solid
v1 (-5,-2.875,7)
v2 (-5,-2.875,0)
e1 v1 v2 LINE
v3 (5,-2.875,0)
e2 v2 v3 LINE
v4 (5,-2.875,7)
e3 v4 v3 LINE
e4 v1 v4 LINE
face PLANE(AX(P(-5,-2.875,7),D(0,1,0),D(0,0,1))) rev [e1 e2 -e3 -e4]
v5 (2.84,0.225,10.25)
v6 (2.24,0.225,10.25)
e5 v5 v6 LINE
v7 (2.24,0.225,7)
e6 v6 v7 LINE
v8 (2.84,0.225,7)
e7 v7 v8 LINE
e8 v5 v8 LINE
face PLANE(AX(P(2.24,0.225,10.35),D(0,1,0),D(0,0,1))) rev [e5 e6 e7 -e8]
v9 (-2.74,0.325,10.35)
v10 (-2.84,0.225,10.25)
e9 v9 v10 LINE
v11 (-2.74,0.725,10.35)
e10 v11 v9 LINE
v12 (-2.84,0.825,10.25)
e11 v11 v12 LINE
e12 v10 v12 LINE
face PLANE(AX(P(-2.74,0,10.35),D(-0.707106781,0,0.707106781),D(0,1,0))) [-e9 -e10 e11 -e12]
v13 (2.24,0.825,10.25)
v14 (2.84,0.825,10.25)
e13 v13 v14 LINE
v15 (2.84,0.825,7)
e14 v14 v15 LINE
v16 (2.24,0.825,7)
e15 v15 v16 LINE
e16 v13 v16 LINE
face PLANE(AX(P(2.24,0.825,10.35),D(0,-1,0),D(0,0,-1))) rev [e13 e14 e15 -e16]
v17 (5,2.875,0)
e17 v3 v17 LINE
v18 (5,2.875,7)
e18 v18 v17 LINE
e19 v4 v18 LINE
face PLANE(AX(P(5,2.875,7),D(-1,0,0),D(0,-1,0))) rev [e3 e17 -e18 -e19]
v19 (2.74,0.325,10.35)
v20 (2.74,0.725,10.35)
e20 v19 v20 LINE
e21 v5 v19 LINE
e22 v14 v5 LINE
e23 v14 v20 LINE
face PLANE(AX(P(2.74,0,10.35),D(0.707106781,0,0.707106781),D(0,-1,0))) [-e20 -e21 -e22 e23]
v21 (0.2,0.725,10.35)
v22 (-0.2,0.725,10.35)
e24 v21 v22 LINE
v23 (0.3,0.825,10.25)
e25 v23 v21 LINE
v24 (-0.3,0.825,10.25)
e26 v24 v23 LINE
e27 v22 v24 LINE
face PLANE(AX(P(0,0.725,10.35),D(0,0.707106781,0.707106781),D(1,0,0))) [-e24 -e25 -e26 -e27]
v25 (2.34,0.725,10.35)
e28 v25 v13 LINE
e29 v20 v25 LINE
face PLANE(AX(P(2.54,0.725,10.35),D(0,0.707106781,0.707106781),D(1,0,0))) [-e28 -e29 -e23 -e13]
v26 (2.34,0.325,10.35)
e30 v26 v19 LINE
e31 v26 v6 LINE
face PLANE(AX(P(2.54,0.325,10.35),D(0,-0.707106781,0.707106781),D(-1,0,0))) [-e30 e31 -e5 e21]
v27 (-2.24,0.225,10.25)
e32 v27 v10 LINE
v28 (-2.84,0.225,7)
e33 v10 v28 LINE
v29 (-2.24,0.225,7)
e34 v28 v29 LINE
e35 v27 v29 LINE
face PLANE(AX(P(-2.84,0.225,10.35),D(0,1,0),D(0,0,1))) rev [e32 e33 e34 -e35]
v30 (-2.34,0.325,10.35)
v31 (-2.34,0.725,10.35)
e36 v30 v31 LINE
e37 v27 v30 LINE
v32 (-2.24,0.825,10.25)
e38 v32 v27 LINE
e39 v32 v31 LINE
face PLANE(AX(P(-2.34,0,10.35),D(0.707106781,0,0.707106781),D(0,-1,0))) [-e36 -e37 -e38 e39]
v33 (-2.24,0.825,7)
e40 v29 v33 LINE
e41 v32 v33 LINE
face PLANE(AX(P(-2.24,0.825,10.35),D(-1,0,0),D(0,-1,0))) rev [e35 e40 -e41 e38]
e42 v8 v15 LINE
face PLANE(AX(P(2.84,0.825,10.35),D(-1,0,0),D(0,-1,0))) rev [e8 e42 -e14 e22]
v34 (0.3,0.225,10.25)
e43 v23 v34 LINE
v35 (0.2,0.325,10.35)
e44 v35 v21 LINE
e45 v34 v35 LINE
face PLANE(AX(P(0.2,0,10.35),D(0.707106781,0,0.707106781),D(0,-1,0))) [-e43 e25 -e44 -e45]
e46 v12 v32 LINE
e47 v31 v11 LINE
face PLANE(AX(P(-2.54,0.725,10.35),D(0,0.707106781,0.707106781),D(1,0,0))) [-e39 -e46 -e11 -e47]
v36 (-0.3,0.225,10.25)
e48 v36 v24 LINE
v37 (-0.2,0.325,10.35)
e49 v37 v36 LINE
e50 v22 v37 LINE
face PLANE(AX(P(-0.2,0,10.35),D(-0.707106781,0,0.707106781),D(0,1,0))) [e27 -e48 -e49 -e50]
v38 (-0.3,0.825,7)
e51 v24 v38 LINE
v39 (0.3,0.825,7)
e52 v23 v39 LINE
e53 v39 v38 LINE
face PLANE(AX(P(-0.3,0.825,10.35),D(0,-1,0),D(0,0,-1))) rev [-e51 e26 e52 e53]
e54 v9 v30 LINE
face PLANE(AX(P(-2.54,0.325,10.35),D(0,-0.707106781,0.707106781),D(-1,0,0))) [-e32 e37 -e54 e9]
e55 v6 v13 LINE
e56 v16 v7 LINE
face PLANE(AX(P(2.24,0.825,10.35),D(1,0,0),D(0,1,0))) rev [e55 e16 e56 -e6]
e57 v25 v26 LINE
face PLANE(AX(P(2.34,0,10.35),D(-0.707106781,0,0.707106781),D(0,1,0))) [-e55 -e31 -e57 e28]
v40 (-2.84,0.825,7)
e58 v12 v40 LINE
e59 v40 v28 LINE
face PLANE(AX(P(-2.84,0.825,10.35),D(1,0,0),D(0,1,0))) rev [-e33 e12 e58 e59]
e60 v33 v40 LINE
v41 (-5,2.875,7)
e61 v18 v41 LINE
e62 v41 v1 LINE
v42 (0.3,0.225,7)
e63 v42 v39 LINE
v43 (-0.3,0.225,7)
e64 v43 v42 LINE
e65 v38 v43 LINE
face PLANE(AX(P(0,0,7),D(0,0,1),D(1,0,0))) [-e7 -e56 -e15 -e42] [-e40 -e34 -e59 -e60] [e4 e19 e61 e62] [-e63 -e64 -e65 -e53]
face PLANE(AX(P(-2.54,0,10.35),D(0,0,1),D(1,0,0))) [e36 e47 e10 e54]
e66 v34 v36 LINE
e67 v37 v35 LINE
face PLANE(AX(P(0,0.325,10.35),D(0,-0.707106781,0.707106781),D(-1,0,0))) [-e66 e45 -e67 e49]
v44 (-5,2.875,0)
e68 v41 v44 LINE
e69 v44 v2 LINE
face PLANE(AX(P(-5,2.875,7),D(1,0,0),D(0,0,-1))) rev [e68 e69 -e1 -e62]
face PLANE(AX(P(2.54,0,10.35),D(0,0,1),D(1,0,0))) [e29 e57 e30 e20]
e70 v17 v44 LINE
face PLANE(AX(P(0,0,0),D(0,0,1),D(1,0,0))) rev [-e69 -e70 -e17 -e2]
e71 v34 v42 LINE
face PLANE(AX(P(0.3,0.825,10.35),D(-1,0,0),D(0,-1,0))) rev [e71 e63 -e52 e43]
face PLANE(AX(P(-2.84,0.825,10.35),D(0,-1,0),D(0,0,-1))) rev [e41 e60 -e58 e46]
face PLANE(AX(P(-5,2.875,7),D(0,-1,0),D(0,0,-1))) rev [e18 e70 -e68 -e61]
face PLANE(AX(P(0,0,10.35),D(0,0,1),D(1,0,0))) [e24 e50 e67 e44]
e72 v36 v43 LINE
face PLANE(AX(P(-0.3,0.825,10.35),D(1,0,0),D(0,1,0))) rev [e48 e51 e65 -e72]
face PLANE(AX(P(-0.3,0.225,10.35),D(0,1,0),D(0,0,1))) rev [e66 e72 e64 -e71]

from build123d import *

# Parameters (mm, degrees)
ESBO_O1_W                       = 10
ESBO_O1_H                       = 5.75
RESSALTO_EXTRUS_O1_DEPTH        = 7
ESBO_O2_W                       = 0.6
ESBO_O2_H                       = 0.6
RESSALTO_EXTRUS_O2_DEPTH        = 3.35
CHANFRO1_SIZE                   = 0.1
PADR_O_LINEAR1_COUNT            = 2
PADR_O_LINEAR1_PITCH            = 2.54
CHANFRO1_OF_PADR_O_LINEAR1_SIZE = 0.1
PADR_O_START                    = 0.325
PADR_O_LINEAR2_DEPTH            = 0.4
PADR_O_START_2                  = -2.84
PADR_O_LINEAR2_2_DEPTH          = 0.6
PADR_O_START_3                  = -9.256027766
PADR_O_LINEAR2_3_OUTLINE_W      = 1.336074683
PADR_O_LINEAR2_3_OUTLINE_H      = 1.275
PADR_O_LINEAR2_3_OUTLINE_H_2    = 1.325
PADR_O_LINEAR2_3_DEPTH          = 1.256027766
PADR_O_START_4                  = -10
PADR_O_LINEAR2_4_OUTLINE_W      = 1.663925317
PADR_O_LINEAR2_4_OUTLINE_H      = 1.275
PADR_O_LINEAR2_4_OUTLINE_H_2    = 1.325
PADR_O_LINEAR2_4_DEPTH          = 0.743972234


with BuildPart() as part:
    # Esboço1 → Ressalto-extrusão1 (new body)
    with BuildSketch(Plane.XY):
        Rectangle(ESBO_O1_W, ESBO_O1_H)
    extrude(amount=RESSALTO_EXTRUS_O1_DEPTH)

    # Esboço2 → Ressalto-extrusão2 (add)
    with BuildSketch(Plane.XY.offset(7)):
        with Locations((0, 0.525)):
            Rectangle(ESBO_O2_W, ESBO_O2_H)
    ressalto_extrus_o2 = extrude(amount=RESSALTO_EXTRUS_O2_DEPTH)

    # Chanfro1
    chanfro1_edges = [part.edges().sort_by_distance(p)[0] for p in [
        (0.3, 0.525, 10.35),
        (0, 0.825, 10.35),
        (-0.3, 0.525, 10.35),
        (0, 0.225, 10.35),
    ]]
    chamfer(chanfro1_edges, length=CHANFRO1_SIZE)

    # Padrão linear1: Ressalto-extrusão2 ×2
    with Locations(*[(i * PADR_O_LINEAR1_PITCH, 0, 0) for i in range(1, PADR_O_LINEAR1_COUNT)]):
        add(ressalto_extrus_o2)

    # Chanfro1 of Padrão linear1
    chanfro1_of_padr_o_linear1_edges = [part.edges().sort_by_distance(p)[0] for p in [
        (2.84, 0.525, 10.35),
        (2.54, 0.825, 10.35),
        (2.24, 0.525, 10.35),
        (2.54, 0.225, 10.35),
    ]]
    chamfer(chanfro1_of_padr_o_linear1_edges, length=CHANFRO1_OF_PADR_O_LINEAR1_SIZE)

    # Padrão linear2: read off the stored shape, not the designer's step
    # Padrão linear2 outline → Padrão linear2 (add)
    with BuildSketch(Plane(origin=(0, 0, 0), x_dir=(1, 0, 0), z_dir=(0, 1, 0)).offset(PADR_O_START)):
        Polygon((-2.84, -10.25), (-2.74, -10.35), (-2.34, -10.35), (-2.24, -10.25), (-2.24, -7), (-2.84, -7), align=None)
    extrude(amount=PADR_O_LINEAR2_DEPTH)

    # Padr_o linear2 2 outline → Padr_o linear2 2 (add)
    with BuildSketch(Plane.YZ.offset(PADR_O_START_2)):
        Polygon((0.225, 7), (0.325, 7), (0.325, 10.35), (0.225, 10.25), align=None)
        Polygon((0.825, 7), (0.825, 10.25), (0.725, 10.35), (0.725, 7), align=None)
    extrude(amount=PADR_O_LINEAR2_2_DEPTH)

    # Padr_o linear2 3 outline → Padr_o linear2 3 (cut)
    with BuildSketch(Plane(origin=(0, 0, 0), x_dir=(0.7071067811865471, 0, 0.707106781186548), z_dir=(0.707106781186548, 0, -0.707106781186547)).offset(PADR_O_START_3)):
        with Locations((6.331962659, -1.3625)):
            Rectangle(PADR_O_LINEAR2_3_OUTLINE_W, PADR_O_LINEAR2_3_OUTLINE_H)
        with Locations((6.331962659, 0.3375)):
            Rectangle(PADR_O_LINEAR2_3_OUTLINE_W, PADR_O_LINEAR2_3_OUTLINE_H_2)
    extrude(amount=PADR_O_LINEAR2_3_DEPTH, mode=Mode.SUBTRACT)

    # Padr_o linear2 4 outline → Padr_o linear2 4 (cut)
    with BuildSketch(Plane(origin=(0, 0, 0), x_dir=(0.7071067811865471, 0, 0.707106781186548), z_dir=(0.707106781186548, 0, -0.707106781186547)).offset(PADR_O_START_4)):
        with Locations((4.831962659, -1.3625)):
            Rectangle(PADR_O_LINEAR2_4_OUTLINE_W, PADR_O_LINEAR2_4_OUTLINE_H)
        with Locations((4.831962659, 0.3375)):
            Rectangle(PADR_O_LINEAR2_4_OUTLINE_W, PADR_O_LINEAR2_4_OUTLINE_H_2)
    extrude(amount=PADR_O_LINEAR2_4_DEPTH, mode=Mode.SUBTRACT)


solid = part.part
